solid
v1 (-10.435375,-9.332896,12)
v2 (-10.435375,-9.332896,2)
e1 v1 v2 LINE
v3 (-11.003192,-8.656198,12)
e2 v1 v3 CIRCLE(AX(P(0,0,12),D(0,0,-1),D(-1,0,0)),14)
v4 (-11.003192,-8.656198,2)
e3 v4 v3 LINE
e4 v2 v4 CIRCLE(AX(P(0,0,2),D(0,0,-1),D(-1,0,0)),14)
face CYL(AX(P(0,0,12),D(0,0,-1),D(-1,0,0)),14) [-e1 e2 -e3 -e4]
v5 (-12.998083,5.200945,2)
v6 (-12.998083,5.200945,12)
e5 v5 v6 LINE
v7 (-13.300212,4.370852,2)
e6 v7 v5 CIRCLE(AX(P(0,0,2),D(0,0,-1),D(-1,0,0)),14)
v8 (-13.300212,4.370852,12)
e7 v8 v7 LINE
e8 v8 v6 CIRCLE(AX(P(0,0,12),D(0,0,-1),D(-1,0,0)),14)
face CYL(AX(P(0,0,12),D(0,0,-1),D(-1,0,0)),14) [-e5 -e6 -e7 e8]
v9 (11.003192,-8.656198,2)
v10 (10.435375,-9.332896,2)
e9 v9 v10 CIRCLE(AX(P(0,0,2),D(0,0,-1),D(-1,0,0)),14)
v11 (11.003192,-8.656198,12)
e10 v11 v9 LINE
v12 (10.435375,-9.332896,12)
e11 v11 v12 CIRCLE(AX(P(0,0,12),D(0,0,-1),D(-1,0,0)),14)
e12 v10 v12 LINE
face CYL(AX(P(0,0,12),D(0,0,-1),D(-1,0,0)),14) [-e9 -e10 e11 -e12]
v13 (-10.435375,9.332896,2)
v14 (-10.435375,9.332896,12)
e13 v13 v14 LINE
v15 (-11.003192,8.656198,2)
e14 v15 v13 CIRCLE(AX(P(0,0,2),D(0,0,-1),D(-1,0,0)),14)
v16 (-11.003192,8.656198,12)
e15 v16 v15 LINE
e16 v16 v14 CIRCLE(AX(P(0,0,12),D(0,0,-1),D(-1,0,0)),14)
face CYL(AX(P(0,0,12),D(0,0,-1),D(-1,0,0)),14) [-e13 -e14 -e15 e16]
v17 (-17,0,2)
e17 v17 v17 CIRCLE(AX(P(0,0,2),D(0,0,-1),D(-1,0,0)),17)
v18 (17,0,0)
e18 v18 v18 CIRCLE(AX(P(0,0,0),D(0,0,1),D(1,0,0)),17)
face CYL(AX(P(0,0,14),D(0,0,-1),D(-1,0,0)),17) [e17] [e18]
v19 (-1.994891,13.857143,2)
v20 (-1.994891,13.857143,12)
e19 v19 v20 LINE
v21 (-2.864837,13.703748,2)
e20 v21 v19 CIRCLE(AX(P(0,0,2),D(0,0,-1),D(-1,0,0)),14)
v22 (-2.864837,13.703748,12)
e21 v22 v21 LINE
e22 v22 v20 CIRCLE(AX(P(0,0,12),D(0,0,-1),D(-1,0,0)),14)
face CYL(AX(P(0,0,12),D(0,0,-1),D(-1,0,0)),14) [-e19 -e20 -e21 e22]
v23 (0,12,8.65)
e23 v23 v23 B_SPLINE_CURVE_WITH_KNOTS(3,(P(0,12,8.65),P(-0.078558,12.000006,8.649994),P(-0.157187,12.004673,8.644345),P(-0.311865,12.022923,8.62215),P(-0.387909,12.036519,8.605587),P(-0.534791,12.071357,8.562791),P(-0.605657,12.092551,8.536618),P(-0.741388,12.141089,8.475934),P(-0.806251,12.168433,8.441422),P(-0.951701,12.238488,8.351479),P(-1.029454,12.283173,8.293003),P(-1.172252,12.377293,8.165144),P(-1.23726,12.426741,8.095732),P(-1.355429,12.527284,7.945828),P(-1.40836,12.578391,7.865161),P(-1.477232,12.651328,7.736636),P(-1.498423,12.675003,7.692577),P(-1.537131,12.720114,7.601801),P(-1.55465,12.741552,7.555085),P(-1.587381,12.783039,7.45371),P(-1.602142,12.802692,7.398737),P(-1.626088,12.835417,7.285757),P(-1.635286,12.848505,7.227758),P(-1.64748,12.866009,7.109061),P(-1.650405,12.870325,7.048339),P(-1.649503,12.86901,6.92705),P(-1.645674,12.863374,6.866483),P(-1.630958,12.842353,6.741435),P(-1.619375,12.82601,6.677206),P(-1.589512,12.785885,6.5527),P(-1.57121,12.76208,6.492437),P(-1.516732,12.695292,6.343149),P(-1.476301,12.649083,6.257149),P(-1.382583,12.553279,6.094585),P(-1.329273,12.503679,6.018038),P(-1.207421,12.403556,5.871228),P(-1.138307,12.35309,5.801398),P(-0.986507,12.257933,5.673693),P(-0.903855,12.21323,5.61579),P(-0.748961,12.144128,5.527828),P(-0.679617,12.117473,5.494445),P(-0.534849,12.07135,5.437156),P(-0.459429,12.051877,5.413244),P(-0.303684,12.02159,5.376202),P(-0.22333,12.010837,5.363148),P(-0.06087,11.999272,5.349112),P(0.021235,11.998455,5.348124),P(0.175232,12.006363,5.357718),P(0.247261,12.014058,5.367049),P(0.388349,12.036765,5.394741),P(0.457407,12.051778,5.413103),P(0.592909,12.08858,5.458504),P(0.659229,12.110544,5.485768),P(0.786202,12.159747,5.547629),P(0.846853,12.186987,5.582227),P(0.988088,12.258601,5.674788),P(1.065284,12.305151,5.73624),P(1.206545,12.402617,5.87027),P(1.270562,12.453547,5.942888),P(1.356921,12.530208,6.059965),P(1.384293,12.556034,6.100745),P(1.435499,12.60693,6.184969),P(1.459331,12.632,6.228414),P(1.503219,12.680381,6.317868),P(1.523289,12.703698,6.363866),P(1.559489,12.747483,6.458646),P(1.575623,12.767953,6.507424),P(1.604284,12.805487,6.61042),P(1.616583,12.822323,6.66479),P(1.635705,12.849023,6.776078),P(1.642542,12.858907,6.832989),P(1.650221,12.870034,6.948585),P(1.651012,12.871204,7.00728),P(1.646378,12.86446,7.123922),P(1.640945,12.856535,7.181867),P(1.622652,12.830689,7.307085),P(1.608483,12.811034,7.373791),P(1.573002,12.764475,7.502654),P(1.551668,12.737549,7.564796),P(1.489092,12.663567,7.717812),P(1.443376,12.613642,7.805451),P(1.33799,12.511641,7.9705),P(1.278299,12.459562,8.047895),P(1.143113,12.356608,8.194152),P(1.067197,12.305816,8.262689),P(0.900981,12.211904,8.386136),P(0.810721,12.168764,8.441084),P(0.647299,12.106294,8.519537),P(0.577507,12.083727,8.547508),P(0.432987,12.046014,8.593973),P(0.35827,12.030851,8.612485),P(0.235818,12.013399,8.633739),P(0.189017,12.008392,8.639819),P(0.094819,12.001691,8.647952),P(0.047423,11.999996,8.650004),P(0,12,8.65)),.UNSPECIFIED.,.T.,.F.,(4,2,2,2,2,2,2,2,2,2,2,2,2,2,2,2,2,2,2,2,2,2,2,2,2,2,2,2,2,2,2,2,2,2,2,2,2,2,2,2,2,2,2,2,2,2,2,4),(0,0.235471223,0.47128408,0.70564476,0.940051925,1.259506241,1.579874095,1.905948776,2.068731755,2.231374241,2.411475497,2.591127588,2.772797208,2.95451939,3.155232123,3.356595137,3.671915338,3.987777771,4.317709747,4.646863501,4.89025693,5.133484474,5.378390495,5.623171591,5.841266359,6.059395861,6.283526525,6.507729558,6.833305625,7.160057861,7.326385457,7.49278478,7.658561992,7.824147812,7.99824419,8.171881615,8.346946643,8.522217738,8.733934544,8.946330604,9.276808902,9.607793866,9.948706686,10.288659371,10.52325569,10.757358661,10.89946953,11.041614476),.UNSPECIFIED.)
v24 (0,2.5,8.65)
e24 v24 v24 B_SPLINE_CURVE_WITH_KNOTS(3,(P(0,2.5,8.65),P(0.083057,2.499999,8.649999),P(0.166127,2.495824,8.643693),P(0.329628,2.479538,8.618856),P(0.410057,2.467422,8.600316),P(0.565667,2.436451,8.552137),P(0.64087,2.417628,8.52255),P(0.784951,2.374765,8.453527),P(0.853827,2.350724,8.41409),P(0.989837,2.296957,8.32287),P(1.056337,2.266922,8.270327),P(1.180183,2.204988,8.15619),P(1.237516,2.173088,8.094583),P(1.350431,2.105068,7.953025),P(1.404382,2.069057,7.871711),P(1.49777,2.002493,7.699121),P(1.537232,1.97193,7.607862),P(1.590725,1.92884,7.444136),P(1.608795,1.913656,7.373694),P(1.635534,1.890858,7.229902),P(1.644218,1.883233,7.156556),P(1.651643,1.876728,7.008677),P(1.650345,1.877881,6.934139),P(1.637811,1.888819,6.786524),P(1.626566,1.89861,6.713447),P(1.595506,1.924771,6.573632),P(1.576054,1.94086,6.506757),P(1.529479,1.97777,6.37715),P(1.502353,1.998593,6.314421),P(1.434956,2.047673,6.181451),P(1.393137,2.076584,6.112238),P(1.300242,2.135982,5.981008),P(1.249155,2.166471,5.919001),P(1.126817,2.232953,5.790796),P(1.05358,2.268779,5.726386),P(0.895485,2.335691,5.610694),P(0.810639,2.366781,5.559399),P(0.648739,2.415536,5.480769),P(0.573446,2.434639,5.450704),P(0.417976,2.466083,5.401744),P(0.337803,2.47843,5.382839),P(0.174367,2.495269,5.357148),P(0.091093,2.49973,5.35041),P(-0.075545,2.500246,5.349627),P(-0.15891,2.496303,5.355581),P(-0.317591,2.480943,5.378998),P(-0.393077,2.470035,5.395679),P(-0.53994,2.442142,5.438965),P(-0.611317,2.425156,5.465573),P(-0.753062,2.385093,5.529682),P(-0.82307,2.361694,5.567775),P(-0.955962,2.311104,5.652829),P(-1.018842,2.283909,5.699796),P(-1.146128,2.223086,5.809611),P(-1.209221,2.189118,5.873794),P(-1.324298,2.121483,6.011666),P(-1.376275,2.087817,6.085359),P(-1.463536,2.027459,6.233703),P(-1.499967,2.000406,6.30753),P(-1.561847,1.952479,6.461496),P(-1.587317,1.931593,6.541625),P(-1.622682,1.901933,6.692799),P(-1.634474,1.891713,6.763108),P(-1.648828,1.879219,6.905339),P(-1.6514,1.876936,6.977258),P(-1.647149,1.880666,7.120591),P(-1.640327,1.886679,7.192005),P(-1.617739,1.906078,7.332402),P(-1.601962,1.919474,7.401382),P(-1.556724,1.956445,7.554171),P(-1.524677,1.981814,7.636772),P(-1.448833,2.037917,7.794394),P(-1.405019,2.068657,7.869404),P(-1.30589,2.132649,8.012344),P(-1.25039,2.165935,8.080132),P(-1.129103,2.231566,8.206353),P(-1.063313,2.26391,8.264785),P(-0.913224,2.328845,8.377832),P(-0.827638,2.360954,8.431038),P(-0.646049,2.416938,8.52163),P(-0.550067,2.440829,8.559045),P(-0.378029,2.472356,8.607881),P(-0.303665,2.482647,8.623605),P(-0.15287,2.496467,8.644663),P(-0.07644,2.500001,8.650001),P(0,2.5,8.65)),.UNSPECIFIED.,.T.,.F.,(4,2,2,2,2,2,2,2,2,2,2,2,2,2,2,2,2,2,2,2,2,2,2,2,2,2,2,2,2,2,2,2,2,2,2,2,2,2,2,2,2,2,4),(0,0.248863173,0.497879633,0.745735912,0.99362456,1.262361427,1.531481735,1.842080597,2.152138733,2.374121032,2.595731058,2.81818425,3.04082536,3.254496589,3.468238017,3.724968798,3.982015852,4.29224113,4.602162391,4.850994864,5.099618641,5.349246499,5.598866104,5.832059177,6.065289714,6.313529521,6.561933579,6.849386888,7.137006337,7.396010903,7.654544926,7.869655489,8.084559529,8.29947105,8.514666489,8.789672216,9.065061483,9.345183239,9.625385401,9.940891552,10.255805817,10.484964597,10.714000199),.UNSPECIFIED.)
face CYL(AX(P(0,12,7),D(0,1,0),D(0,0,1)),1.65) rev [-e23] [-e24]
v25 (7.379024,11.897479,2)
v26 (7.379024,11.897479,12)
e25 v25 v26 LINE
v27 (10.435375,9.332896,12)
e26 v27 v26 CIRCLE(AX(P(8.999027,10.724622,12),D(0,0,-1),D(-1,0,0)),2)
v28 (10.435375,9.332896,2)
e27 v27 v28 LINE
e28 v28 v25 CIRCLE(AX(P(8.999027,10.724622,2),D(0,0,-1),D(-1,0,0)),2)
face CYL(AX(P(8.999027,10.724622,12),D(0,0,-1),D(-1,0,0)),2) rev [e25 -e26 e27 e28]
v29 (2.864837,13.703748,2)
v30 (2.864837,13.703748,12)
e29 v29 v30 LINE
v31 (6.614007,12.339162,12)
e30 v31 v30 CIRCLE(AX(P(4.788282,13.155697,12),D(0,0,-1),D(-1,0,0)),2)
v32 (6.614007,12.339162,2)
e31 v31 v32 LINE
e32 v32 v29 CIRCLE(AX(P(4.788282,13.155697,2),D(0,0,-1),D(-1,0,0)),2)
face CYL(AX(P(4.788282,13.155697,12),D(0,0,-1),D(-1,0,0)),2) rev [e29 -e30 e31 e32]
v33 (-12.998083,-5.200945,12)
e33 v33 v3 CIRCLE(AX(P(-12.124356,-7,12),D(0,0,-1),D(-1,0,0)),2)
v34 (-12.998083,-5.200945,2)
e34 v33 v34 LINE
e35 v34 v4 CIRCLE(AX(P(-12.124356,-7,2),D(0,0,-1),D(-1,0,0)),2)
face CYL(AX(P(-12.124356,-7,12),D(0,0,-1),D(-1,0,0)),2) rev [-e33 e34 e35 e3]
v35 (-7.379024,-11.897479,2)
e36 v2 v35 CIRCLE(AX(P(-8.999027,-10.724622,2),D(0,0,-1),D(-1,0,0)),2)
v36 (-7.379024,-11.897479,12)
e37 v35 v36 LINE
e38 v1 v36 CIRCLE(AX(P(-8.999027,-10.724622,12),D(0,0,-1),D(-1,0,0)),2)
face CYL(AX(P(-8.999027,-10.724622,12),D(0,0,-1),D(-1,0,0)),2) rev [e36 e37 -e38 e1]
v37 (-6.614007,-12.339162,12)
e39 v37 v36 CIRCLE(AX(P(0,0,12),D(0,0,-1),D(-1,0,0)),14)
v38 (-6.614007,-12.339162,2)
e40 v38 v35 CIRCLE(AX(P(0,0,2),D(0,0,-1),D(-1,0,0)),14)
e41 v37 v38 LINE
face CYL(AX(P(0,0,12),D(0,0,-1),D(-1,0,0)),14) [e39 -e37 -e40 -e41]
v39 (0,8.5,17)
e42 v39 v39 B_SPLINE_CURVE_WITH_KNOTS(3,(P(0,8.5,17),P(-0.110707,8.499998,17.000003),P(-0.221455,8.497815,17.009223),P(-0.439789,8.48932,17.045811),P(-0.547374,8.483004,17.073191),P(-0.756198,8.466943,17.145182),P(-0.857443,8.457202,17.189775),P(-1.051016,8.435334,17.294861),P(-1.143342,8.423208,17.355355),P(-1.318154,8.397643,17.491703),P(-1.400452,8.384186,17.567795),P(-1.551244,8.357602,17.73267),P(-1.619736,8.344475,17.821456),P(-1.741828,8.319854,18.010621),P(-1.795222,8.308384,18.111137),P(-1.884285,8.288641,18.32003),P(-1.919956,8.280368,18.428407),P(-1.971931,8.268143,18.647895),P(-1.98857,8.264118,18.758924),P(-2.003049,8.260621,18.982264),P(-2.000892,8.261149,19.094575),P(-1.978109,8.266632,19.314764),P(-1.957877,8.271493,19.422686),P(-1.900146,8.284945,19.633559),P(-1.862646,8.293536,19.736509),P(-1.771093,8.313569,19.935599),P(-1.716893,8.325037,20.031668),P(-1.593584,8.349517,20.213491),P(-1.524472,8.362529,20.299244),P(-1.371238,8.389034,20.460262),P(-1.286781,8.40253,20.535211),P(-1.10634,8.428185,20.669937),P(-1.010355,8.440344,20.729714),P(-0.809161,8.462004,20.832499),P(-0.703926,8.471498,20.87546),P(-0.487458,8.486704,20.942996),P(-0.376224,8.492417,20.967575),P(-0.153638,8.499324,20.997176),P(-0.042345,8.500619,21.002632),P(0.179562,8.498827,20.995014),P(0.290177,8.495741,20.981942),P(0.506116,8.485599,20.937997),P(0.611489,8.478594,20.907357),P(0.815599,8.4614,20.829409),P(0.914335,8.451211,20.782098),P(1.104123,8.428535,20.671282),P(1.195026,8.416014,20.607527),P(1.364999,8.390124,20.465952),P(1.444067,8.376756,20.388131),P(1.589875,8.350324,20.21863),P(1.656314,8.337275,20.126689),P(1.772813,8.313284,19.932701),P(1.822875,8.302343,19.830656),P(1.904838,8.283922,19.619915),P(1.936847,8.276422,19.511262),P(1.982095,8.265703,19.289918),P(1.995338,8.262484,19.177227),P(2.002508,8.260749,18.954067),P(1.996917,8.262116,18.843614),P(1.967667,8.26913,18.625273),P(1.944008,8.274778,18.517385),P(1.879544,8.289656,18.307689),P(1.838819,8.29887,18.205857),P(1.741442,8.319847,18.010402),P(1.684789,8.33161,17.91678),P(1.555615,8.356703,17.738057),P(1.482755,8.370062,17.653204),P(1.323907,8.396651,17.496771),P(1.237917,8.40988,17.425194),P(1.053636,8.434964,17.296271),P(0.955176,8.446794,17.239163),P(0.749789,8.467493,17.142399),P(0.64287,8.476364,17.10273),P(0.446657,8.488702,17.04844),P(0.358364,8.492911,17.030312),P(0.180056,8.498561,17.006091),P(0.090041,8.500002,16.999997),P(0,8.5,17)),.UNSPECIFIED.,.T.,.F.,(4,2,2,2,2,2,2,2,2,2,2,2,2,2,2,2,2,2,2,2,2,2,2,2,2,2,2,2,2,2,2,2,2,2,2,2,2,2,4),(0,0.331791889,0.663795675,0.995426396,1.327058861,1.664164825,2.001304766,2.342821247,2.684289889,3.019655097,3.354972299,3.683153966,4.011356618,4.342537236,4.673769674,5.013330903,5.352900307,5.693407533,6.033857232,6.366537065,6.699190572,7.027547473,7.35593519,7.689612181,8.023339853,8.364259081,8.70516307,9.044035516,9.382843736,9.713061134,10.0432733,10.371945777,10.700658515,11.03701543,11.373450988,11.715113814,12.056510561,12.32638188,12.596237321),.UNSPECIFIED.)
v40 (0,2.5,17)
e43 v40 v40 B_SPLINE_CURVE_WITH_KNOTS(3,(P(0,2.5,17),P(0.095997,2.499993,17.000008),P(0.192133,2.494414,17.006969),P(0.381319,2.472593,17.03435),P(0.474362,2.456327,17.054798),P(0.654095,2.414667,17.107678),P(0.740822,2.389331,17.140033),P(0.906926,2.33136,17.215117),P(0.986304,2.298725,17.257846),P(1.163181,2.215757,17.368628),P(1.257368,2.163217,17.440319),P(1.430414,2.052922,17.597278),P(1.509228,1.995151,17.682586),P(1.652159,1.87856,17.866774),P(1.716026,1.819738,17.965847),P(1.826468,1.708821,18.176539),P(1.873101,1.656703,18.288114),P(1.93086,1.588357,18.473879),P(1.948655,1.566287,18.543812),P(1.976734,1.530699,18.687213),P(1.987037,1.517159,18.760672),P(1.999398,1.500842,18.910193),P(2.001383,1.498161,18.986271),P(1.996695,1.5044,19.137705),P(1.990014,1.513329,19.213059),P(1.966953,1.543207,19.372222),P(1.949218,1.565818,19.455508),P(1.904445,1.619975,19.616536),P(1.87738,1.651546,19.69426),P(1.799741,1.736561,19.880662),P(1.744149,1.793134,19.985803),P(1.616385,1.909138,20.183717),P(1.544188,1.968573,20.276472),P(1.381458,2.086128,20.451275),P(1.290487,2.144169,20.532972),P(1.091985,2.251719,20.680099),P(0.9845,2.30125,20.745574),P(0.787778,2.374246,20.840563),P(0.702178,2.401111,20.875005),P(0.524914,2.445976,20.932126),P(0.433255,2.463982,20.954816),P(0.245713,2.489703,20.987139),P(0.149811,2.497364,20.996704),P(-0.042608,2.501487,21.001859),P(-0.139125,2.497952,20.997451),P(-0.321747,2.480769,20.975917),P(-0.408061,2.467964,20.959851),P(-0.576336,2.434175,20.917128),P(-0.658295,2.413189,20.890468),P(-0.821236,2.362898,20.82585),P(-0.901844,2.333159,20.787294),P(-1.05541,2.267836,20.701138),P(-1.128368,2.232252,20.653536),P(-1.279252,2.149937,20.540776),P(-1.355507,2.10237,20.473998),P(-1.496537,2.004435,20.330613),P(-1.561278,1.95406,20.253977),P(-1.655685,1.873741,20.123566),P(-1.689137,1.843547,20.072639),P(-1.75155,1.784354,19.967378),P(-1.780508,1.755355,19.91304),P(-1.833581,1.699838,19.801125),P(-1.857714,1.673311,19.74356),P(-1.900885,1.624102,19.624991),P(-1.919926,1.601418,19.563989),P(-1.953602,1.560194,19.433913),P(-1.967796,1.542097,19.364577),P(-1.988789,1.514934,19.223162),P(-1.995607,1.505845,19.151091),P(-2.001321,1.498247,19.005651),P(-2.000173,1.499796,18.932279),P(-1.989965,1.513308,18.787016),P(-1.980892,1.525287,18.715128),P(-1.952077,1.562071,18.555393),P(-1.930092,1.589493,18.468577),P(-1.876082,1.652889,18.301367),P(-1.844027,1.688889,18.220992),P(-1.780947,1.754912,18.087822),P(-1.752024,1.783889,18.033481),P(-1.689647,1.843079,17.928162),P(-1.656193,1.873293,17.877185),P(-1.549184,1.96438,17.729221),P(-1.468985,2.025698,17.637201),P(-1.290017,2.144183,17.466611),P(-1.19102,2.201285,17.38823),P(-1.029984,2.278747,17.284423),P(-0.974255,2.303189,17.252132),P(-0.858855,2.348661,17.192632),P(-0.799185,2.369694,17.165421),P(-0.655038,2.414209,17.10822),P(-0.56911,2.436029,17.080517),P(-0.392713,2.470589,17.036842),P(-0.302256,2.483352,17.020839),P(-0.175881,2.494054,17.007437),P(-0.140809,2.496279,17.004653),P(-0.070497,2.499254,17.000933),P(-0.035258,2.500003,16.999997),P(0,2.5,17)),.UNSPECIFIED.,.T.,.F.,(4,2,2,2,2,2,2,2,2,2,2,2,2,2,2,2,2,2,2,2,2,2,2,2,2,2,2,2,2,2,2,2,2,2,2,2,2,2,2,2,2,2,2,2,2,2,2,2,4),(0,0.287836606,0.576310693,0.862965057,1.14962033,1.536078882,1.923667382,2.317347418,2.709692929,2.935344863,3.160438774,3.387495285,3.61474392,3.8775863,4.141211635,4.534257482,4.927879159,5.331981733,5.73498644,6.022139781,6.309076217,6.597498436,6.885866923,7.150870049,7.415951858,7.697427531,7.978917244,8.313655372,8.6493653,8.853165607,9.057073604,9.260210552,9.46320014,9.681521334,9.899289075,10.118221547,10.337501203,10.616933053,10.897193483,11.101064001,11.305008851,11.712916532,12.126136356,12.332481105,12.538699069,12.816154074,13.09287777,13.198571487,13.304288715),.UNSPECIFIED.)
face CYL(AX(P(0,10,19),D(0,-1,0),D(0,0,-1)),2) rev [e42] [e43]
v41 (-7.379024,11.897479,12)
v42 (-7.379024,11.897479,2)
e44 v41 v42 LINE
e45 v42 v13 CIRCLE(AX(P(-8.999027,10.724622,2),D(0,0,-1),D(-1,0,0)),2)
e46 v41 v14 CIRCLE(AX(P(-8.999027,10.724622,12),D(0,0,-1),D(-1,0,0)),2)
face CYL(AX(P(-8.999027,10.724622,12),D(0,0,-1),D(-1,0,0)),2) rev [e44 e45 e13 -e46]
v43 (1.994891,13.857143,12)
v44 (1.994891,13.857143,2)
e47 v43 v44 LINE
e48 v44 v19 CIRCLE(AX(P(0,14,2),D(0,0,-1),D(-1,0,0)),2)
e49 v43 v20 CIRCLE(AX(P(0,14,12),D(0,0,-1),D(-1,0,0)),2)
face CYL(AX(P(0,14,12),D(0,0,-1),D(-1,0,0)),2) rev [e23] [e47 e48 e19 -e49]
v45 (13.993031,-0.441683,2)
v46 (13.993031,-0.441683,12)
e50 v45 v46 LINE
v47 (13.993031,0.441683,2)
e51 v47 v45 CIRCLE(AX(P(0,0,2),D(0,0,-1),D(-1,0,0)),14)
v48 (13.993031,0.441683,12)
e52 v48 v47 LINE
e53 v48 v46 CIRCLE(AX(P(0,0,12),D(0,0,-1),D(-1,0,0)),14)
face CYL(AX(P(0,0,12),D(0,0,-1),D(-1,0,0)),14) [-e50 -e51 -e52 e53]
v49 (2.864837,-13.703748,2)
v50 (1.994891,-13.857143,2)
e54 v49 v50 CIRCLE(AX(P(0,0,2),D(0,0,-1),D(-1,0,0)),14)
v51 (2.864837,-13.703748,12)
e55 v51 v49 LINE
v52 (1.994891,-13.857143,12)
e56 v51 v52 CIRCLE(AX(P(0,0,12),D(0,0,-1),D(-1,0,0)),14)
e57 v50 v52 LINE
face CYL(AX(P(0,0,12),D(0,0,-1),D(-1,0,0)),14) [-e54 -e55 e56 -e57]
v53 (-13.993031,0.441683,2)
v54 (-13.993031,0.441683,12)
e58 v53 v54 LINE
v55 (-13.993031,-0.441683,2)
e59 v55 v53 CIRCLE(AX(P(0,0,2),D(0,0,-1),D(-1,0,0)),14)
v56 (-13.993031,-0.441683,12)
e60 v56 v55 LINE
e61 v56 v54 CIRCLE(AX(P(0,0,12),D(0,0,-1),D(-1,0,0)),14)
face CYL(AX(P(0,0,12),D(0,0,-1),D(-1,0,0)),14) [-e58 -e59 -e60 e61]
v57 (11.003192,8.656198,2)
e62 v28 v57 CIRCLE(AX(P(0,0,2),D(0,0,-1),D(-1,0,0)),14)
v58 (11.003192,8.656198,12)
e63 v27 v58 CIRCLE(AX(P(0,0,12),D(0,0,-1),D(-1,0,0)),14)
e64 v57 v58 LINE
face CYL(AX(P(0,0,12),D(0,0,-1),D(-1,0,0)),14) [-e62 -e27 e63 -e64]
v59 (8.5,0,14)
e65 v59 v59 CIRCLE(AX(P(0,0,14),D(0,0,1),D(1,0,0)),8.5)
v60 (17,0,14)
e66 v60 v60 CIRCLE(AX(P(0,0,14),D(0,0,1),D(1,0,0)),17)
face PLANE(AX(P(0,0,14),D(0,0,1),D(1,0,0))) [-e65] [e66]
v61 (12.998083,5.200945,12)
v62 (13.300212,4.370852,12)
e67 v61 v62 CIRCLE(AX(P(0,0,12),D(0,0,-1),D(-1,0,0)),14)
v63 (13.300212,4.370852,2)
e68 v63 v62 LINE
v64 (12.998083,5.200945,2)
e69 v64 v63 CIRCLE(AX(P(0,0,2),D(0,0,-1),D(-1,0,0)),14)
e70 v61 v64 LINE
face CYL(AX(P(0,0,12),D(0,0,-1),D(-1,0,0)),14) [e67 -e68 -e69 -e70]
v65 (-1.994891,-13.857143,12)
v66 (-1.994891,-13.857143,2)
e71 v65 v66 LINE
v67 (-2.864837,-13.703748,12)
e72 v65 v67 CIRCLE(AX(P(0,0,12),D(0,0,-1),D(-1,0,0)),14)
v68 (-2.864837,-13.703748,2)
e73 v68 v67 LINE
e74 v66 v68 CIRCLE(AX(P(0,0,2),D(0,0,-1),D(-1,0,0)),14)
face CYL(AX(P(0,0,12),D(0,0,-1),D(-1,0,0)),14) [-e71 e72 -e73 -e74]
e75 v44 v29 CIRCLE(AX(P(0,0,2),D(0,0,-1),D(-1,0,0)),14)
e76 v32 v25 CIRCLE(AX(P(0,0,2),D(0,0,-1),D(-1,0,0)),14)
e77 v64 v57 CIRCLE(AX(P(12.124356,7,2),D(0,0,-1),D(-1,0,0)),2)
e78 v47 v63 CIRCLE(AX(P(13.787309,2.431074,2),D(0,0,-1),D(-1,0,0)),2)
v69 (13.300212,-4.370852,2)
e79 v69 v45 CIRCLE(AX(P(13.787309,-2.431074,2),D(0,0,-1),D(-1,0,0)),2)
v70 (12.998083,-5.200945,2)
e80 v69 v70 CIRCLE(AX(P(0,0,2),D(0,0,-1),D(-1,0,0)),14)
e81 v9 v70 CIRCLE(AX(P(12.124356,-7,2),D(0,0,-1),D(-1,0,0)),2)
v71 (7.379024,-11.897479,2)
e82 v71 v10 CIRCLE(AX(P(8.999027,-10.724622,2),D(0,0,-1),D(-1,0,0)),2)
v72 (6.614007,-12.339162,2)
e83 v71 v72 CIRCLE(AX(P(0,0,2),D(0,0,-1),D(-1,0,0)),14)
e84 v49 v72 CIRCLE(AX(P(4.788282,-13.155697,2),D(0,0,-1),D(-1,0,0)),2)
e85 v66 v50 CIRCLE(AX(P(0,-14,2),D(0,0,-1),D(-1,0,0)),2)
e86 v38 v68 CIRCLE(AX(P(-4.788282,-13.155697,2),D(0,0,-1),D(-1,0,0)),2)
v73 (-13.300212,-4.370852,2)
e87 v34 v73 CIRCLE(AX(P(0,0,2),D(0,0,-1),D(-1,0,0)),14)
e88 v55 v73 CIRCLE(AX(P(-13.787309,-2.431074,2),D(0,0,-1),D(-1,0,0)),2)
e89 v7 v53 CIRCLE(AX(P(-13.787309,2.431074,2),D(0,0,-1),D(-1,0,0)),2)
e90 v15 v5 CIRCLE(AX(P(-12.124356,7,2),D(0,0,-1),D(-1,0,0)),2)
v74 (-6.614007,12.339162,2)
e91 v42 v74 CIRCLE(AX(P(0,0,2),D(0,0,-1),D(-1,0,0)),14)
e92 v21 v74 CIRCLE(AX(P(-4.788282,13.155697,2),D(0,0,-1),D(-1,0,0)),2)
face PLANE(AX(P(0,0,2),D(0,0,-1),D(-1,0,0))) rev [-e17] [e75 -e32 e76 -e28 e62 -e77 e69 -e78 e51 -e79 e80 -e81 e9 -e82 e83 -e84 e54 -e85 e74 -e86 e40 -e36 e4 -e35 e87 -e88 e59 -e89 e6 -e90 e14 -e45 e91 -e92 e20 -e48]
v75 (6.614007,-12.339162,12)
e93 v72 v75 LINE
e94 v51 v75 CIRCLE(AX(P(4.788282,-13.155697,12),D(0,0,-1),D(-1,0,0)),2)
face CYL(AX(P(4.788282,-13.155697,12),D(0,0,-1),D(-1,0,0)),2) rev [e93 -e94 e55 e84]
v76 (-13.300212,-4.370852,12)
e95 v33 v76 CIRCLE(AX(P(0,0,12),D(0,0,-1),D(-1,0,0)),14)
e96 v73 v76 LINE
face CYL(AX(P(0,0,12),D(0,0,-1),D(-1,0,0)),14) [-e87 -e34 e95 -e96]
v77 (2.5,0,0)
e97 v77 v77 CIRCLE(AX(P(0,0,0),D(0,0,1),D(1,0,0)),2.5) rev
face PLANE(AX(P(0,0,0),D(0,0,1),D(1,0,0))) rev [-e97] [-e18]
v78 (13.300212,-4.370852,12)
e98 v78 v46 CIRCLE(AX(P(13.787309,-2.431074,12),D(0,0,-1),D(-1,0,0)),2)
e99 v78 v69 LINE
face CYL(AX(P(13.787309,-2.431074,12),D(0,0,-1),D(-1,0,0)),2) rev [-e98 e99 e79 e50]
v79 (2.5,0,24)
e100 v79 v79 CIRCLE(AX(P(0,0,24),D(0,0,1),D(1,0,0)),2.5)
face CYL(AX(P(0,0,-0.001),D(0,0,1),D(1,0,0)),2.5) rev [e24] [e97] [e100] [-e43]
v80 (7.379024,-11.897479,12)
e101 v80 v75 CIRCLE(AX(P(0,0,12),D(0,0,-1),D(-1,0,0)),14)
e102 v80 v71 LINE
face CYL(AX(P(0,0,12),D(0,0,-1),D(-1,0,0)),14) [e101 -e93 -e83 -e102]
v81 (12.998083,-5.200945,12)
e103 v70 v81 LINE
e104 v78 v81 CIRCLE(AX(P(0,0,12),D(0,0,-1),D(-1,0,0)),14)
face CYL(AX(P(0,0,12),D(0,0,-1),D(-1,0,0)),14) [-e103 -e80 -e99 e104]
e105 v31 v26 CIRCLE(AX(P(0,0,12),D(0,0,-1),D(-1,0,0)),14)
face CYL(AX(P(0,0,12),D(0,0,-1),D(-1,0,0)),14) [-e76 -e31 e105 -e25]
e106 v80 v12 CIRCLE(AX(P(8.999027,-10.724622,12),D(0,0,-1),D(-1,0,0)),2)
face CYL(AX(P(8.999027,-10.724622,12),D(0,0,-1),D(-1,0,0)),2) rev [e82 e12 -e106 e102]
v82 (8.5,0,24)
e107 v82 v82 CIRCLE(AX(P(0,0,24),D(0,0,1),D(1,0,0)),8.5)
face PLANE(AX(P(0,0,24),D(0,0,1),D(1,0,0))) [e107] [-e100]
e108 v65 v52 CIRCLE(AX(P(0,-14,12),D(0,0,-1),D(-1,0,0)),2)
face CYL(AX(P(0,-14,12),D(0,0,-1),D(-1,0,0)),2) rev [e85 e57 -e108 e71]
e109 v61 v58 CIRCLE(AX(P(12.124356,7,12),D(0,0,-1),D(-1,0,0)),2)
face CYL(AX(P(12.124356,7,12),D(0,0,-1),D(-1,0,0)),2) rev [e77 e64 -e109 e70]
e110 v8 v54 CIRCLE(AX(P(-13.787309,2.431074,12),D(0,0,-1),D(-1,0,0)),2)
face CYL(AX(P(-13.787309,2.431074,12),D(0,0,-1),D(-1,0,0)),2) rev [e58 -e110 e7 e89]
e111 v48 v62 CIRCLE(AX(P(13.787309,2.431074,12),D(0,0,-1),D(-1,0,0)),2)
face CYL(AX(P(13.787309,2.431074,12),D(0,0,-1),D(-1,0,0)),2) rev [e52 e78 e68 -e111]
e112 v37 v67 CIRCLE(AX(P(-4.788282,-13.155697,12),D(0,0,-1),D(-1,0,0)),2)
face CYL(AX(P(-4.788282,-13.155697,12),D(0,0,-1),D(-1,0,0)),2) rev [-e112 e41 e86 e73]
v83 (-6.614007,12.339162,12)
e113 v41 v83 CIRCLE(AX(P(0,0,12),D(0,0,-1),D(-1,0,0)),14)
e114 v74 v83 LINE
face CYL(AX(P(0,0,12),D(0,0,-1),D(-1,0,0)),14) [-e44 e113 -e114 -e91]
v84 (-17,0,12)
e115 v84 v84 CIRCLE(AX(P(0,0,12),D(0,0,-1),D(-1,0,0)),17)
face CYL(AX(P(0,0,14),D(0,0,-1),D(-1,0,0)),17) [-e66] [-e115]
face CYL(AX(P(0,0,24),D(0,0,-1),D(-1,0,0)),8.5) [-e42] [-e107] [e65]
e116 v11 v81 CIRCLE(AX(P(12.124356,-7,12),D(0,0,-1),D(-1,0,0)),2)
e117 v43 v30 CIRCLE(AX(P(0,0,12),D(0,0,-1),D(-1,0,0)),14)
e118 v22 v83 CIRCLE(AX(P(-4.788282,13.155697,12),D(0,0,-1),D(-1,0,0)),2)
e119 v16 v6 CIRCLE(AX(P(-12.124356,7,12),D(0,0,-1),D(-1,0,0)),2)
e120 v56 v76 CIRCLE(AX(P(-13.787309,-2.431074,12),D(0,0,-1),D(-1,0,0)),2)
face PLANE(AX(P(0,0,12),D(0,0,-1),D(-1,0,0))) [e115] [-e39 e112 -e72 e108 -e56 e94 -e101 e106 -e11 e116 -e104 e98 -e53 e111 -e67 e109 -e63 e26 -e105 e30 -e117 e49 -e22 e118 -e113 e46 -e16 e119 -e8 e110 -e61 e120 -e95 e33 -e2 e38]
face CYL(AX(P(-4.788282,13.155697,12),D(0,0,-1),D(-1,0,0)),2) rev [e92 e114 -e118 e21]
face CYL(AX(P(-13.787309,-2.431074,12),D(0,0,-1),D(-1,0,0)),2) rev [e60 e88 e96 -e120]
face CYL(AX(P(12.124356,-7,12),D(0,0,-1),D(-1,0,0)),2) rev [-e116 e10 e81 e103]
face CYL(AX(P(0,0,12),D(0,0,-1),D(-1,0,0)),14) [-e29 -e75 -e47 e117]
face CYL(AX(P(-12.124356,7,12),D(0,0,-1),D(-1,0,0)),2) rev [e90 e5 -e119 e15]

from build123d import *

# Parameters (mm, degrees)
SKETCH1_R                 = 17
BOSS_EXTRUDE1_DEPTH       = 14
CUT_EXTRUDE2_REACH        = 29.821
SKETCH3_R                 = 2.5
BOSS_EXTRUDE2_START       = 10
SKETCH5_R                 = 8.5
SKETCH5_R_2               = 2.5
BOSS_EXTRUDE2_DEPTH       = 10
SKETCH7_R                 = 17
SKETCH7_R_2               = 14
CUT_EXTRUDE5_DEPTH        = 5
SKETCH8_R                 = 2
CUT_EXTRUDE6_DEPTH        = 5
SKETCH9_R                 = 2
CUT_EXTRUDE7_DEPTH        = 10
M4_TAPPED_HOLE2_OUTLINE_W = 1.65
M4_TAPPED_HOLE2_OUTLINE_H = 10.992017373


with BuildPart() as part:
    # Sketch1 → Boss-Extrude1 (new body)
    with BuildSketch(Plane.XY):
        Circle(SKETCH1_R)
    extrude(amount=BOSS_EXTRUDE1_DEPTH)

    # Sketch3 → Cut-Extrude2 (cut, up to next)
    with BuildSketch(Plane.XY.offset(14), mode=Mode.PRIVATE) as cut_extrude2_sk1:
        Circle(SKETCH3_R)
    cut_extrude2_tool1 = extrude(cut_extrude2_sk1.sketch, amount=-CUT_EXTRUDE2_REACH, mode=Mode.PRIVATE) & part.part
    add(cut_extrude2_tool1.solids().sort_by_distance((0, 0, 14))[0], mode=Mode.SUBTRACT)

    # Sketch5 → Boss-Extrude2 (add)
    with BuildSketch(Plane.XY.offset(14).offset(BOSS_EXTRUDE2_START)):
        Circle(SKETCH5_R)
        Circle(SKETCH5_R_2, mode=Mode.SUBTRACT)
    extrude(amount=-BOSS_EXTRUDE2_DEPTH)

    # Sketch7 → Cut-Extrude5 (cut, symmetric)
    with BuildSketch(Plane(origin=(0, 0, 7), x_dir=(-1, 0, 0), z_dir=(0, 0, -1))):
        Circle(SKETCH7_R)
        Circle(SKETCH7_R_2, mode=Mode.SUBTRACT)
    extrude(amount=CUT_EXTRUDE5_DEPTH, both=True, mode=Mode.SUBTRACT)

    # Sketch8 → Cut-Extrude6 (cut, symmetric)
    with BuildSketch(Plane(origin=(0, 0, 7), x_dir=(-1, 0, 0), z_dir=(0, 0, -1))):
        with Locations((0, 14)):
            Circle(SKETCH8_R)
        with Locations((4.788282007, 13.155696691)):
            Circle(SKETCH8_R)
        with Locations((8.999026536, 10.724622204)):
            Circle(SKETCH8_R)
        with Locations((12.124355653, 7)):
            Circle(SKETCH8_R)
        with Locations((13.787308542, 2.431074487)):
            Circle(SKETCH8_R)
        with Locations((13.787308542, -2.431074487)):
            Circle(SKETCH8_R)
        with Locations((12.124355653, -7)):
            Circle(SKETCH8_R)
        with Locations((8.999026536, -10.724622204)):
            Circle(SKETCH8_R)
        with Locations((4.788282007, -13.155696691)):
            Circle(SKETCH8_R)
        with Locations((0, -14)):
            Circle(SKETCH8_R)
        with Locations((-4.788282007, -13.155696691)):
            Circle(SKETCH8_R)
        with Locations((-8.999026536, -10.724622204)):
            Circle(SKETCH8_R)
        with Locations((-12.124355653, -7)):
            Circle(SKETCH8_R)
        with Locations((-13.787308542, -2.431074487)):
            Circle(SKETCH8_R)
        with Locations((-13.787308542, 2.431074487)):
            Circle(SKETCH8_R)
        with Locations((-12.124355653, 7)):
            Circle(SKETCH8_R)
        with Locations((-8.999026536, 10.724622204)):
            Circle(SKETCH8_R)
        with Locations((-4.788282007, 13.155696691)):
            Circle(SKETCH8_R)
    extrude(amount=CUT_EXTRUDE6_DEPTH, both=True, mode=Mode.SUBTRACT)

    # Sketch9 → Cut-Extrude7 (cut)
    with BuildSketch(Plane(origin=(0, 0, 0), x_dir=(1, 0, 0), z_dir=(0, 1, 0))):
        with Locations(Location((0, -19, 0), (0, 0, 90))):
            Circle(SKETCH9_R)
    extrude(amount=CUT_EXTRUDE7_DEPTH, mode=Mode.SUBTRACT)

    # M4 Tapped Hole2: read off the stored shape, not the designer's step
    # M4 Tapped Hole2 outline → M4 Tapped Hole2 (revolve, cut)
    with BuildSketch(Plane.XY.offset(7)):
        with Locations((0.825, 7.373848872)):
            Rectangle(M4_TAPPED_HOLE2_OUTLINE_W, M4_TAPPED_HOLE2_OUTLINE_H)
    revolve(axis=Axis((0, 0, 7), (0, 1, 0)), mode=Mode.SUBTRACT)


solid = part.part
